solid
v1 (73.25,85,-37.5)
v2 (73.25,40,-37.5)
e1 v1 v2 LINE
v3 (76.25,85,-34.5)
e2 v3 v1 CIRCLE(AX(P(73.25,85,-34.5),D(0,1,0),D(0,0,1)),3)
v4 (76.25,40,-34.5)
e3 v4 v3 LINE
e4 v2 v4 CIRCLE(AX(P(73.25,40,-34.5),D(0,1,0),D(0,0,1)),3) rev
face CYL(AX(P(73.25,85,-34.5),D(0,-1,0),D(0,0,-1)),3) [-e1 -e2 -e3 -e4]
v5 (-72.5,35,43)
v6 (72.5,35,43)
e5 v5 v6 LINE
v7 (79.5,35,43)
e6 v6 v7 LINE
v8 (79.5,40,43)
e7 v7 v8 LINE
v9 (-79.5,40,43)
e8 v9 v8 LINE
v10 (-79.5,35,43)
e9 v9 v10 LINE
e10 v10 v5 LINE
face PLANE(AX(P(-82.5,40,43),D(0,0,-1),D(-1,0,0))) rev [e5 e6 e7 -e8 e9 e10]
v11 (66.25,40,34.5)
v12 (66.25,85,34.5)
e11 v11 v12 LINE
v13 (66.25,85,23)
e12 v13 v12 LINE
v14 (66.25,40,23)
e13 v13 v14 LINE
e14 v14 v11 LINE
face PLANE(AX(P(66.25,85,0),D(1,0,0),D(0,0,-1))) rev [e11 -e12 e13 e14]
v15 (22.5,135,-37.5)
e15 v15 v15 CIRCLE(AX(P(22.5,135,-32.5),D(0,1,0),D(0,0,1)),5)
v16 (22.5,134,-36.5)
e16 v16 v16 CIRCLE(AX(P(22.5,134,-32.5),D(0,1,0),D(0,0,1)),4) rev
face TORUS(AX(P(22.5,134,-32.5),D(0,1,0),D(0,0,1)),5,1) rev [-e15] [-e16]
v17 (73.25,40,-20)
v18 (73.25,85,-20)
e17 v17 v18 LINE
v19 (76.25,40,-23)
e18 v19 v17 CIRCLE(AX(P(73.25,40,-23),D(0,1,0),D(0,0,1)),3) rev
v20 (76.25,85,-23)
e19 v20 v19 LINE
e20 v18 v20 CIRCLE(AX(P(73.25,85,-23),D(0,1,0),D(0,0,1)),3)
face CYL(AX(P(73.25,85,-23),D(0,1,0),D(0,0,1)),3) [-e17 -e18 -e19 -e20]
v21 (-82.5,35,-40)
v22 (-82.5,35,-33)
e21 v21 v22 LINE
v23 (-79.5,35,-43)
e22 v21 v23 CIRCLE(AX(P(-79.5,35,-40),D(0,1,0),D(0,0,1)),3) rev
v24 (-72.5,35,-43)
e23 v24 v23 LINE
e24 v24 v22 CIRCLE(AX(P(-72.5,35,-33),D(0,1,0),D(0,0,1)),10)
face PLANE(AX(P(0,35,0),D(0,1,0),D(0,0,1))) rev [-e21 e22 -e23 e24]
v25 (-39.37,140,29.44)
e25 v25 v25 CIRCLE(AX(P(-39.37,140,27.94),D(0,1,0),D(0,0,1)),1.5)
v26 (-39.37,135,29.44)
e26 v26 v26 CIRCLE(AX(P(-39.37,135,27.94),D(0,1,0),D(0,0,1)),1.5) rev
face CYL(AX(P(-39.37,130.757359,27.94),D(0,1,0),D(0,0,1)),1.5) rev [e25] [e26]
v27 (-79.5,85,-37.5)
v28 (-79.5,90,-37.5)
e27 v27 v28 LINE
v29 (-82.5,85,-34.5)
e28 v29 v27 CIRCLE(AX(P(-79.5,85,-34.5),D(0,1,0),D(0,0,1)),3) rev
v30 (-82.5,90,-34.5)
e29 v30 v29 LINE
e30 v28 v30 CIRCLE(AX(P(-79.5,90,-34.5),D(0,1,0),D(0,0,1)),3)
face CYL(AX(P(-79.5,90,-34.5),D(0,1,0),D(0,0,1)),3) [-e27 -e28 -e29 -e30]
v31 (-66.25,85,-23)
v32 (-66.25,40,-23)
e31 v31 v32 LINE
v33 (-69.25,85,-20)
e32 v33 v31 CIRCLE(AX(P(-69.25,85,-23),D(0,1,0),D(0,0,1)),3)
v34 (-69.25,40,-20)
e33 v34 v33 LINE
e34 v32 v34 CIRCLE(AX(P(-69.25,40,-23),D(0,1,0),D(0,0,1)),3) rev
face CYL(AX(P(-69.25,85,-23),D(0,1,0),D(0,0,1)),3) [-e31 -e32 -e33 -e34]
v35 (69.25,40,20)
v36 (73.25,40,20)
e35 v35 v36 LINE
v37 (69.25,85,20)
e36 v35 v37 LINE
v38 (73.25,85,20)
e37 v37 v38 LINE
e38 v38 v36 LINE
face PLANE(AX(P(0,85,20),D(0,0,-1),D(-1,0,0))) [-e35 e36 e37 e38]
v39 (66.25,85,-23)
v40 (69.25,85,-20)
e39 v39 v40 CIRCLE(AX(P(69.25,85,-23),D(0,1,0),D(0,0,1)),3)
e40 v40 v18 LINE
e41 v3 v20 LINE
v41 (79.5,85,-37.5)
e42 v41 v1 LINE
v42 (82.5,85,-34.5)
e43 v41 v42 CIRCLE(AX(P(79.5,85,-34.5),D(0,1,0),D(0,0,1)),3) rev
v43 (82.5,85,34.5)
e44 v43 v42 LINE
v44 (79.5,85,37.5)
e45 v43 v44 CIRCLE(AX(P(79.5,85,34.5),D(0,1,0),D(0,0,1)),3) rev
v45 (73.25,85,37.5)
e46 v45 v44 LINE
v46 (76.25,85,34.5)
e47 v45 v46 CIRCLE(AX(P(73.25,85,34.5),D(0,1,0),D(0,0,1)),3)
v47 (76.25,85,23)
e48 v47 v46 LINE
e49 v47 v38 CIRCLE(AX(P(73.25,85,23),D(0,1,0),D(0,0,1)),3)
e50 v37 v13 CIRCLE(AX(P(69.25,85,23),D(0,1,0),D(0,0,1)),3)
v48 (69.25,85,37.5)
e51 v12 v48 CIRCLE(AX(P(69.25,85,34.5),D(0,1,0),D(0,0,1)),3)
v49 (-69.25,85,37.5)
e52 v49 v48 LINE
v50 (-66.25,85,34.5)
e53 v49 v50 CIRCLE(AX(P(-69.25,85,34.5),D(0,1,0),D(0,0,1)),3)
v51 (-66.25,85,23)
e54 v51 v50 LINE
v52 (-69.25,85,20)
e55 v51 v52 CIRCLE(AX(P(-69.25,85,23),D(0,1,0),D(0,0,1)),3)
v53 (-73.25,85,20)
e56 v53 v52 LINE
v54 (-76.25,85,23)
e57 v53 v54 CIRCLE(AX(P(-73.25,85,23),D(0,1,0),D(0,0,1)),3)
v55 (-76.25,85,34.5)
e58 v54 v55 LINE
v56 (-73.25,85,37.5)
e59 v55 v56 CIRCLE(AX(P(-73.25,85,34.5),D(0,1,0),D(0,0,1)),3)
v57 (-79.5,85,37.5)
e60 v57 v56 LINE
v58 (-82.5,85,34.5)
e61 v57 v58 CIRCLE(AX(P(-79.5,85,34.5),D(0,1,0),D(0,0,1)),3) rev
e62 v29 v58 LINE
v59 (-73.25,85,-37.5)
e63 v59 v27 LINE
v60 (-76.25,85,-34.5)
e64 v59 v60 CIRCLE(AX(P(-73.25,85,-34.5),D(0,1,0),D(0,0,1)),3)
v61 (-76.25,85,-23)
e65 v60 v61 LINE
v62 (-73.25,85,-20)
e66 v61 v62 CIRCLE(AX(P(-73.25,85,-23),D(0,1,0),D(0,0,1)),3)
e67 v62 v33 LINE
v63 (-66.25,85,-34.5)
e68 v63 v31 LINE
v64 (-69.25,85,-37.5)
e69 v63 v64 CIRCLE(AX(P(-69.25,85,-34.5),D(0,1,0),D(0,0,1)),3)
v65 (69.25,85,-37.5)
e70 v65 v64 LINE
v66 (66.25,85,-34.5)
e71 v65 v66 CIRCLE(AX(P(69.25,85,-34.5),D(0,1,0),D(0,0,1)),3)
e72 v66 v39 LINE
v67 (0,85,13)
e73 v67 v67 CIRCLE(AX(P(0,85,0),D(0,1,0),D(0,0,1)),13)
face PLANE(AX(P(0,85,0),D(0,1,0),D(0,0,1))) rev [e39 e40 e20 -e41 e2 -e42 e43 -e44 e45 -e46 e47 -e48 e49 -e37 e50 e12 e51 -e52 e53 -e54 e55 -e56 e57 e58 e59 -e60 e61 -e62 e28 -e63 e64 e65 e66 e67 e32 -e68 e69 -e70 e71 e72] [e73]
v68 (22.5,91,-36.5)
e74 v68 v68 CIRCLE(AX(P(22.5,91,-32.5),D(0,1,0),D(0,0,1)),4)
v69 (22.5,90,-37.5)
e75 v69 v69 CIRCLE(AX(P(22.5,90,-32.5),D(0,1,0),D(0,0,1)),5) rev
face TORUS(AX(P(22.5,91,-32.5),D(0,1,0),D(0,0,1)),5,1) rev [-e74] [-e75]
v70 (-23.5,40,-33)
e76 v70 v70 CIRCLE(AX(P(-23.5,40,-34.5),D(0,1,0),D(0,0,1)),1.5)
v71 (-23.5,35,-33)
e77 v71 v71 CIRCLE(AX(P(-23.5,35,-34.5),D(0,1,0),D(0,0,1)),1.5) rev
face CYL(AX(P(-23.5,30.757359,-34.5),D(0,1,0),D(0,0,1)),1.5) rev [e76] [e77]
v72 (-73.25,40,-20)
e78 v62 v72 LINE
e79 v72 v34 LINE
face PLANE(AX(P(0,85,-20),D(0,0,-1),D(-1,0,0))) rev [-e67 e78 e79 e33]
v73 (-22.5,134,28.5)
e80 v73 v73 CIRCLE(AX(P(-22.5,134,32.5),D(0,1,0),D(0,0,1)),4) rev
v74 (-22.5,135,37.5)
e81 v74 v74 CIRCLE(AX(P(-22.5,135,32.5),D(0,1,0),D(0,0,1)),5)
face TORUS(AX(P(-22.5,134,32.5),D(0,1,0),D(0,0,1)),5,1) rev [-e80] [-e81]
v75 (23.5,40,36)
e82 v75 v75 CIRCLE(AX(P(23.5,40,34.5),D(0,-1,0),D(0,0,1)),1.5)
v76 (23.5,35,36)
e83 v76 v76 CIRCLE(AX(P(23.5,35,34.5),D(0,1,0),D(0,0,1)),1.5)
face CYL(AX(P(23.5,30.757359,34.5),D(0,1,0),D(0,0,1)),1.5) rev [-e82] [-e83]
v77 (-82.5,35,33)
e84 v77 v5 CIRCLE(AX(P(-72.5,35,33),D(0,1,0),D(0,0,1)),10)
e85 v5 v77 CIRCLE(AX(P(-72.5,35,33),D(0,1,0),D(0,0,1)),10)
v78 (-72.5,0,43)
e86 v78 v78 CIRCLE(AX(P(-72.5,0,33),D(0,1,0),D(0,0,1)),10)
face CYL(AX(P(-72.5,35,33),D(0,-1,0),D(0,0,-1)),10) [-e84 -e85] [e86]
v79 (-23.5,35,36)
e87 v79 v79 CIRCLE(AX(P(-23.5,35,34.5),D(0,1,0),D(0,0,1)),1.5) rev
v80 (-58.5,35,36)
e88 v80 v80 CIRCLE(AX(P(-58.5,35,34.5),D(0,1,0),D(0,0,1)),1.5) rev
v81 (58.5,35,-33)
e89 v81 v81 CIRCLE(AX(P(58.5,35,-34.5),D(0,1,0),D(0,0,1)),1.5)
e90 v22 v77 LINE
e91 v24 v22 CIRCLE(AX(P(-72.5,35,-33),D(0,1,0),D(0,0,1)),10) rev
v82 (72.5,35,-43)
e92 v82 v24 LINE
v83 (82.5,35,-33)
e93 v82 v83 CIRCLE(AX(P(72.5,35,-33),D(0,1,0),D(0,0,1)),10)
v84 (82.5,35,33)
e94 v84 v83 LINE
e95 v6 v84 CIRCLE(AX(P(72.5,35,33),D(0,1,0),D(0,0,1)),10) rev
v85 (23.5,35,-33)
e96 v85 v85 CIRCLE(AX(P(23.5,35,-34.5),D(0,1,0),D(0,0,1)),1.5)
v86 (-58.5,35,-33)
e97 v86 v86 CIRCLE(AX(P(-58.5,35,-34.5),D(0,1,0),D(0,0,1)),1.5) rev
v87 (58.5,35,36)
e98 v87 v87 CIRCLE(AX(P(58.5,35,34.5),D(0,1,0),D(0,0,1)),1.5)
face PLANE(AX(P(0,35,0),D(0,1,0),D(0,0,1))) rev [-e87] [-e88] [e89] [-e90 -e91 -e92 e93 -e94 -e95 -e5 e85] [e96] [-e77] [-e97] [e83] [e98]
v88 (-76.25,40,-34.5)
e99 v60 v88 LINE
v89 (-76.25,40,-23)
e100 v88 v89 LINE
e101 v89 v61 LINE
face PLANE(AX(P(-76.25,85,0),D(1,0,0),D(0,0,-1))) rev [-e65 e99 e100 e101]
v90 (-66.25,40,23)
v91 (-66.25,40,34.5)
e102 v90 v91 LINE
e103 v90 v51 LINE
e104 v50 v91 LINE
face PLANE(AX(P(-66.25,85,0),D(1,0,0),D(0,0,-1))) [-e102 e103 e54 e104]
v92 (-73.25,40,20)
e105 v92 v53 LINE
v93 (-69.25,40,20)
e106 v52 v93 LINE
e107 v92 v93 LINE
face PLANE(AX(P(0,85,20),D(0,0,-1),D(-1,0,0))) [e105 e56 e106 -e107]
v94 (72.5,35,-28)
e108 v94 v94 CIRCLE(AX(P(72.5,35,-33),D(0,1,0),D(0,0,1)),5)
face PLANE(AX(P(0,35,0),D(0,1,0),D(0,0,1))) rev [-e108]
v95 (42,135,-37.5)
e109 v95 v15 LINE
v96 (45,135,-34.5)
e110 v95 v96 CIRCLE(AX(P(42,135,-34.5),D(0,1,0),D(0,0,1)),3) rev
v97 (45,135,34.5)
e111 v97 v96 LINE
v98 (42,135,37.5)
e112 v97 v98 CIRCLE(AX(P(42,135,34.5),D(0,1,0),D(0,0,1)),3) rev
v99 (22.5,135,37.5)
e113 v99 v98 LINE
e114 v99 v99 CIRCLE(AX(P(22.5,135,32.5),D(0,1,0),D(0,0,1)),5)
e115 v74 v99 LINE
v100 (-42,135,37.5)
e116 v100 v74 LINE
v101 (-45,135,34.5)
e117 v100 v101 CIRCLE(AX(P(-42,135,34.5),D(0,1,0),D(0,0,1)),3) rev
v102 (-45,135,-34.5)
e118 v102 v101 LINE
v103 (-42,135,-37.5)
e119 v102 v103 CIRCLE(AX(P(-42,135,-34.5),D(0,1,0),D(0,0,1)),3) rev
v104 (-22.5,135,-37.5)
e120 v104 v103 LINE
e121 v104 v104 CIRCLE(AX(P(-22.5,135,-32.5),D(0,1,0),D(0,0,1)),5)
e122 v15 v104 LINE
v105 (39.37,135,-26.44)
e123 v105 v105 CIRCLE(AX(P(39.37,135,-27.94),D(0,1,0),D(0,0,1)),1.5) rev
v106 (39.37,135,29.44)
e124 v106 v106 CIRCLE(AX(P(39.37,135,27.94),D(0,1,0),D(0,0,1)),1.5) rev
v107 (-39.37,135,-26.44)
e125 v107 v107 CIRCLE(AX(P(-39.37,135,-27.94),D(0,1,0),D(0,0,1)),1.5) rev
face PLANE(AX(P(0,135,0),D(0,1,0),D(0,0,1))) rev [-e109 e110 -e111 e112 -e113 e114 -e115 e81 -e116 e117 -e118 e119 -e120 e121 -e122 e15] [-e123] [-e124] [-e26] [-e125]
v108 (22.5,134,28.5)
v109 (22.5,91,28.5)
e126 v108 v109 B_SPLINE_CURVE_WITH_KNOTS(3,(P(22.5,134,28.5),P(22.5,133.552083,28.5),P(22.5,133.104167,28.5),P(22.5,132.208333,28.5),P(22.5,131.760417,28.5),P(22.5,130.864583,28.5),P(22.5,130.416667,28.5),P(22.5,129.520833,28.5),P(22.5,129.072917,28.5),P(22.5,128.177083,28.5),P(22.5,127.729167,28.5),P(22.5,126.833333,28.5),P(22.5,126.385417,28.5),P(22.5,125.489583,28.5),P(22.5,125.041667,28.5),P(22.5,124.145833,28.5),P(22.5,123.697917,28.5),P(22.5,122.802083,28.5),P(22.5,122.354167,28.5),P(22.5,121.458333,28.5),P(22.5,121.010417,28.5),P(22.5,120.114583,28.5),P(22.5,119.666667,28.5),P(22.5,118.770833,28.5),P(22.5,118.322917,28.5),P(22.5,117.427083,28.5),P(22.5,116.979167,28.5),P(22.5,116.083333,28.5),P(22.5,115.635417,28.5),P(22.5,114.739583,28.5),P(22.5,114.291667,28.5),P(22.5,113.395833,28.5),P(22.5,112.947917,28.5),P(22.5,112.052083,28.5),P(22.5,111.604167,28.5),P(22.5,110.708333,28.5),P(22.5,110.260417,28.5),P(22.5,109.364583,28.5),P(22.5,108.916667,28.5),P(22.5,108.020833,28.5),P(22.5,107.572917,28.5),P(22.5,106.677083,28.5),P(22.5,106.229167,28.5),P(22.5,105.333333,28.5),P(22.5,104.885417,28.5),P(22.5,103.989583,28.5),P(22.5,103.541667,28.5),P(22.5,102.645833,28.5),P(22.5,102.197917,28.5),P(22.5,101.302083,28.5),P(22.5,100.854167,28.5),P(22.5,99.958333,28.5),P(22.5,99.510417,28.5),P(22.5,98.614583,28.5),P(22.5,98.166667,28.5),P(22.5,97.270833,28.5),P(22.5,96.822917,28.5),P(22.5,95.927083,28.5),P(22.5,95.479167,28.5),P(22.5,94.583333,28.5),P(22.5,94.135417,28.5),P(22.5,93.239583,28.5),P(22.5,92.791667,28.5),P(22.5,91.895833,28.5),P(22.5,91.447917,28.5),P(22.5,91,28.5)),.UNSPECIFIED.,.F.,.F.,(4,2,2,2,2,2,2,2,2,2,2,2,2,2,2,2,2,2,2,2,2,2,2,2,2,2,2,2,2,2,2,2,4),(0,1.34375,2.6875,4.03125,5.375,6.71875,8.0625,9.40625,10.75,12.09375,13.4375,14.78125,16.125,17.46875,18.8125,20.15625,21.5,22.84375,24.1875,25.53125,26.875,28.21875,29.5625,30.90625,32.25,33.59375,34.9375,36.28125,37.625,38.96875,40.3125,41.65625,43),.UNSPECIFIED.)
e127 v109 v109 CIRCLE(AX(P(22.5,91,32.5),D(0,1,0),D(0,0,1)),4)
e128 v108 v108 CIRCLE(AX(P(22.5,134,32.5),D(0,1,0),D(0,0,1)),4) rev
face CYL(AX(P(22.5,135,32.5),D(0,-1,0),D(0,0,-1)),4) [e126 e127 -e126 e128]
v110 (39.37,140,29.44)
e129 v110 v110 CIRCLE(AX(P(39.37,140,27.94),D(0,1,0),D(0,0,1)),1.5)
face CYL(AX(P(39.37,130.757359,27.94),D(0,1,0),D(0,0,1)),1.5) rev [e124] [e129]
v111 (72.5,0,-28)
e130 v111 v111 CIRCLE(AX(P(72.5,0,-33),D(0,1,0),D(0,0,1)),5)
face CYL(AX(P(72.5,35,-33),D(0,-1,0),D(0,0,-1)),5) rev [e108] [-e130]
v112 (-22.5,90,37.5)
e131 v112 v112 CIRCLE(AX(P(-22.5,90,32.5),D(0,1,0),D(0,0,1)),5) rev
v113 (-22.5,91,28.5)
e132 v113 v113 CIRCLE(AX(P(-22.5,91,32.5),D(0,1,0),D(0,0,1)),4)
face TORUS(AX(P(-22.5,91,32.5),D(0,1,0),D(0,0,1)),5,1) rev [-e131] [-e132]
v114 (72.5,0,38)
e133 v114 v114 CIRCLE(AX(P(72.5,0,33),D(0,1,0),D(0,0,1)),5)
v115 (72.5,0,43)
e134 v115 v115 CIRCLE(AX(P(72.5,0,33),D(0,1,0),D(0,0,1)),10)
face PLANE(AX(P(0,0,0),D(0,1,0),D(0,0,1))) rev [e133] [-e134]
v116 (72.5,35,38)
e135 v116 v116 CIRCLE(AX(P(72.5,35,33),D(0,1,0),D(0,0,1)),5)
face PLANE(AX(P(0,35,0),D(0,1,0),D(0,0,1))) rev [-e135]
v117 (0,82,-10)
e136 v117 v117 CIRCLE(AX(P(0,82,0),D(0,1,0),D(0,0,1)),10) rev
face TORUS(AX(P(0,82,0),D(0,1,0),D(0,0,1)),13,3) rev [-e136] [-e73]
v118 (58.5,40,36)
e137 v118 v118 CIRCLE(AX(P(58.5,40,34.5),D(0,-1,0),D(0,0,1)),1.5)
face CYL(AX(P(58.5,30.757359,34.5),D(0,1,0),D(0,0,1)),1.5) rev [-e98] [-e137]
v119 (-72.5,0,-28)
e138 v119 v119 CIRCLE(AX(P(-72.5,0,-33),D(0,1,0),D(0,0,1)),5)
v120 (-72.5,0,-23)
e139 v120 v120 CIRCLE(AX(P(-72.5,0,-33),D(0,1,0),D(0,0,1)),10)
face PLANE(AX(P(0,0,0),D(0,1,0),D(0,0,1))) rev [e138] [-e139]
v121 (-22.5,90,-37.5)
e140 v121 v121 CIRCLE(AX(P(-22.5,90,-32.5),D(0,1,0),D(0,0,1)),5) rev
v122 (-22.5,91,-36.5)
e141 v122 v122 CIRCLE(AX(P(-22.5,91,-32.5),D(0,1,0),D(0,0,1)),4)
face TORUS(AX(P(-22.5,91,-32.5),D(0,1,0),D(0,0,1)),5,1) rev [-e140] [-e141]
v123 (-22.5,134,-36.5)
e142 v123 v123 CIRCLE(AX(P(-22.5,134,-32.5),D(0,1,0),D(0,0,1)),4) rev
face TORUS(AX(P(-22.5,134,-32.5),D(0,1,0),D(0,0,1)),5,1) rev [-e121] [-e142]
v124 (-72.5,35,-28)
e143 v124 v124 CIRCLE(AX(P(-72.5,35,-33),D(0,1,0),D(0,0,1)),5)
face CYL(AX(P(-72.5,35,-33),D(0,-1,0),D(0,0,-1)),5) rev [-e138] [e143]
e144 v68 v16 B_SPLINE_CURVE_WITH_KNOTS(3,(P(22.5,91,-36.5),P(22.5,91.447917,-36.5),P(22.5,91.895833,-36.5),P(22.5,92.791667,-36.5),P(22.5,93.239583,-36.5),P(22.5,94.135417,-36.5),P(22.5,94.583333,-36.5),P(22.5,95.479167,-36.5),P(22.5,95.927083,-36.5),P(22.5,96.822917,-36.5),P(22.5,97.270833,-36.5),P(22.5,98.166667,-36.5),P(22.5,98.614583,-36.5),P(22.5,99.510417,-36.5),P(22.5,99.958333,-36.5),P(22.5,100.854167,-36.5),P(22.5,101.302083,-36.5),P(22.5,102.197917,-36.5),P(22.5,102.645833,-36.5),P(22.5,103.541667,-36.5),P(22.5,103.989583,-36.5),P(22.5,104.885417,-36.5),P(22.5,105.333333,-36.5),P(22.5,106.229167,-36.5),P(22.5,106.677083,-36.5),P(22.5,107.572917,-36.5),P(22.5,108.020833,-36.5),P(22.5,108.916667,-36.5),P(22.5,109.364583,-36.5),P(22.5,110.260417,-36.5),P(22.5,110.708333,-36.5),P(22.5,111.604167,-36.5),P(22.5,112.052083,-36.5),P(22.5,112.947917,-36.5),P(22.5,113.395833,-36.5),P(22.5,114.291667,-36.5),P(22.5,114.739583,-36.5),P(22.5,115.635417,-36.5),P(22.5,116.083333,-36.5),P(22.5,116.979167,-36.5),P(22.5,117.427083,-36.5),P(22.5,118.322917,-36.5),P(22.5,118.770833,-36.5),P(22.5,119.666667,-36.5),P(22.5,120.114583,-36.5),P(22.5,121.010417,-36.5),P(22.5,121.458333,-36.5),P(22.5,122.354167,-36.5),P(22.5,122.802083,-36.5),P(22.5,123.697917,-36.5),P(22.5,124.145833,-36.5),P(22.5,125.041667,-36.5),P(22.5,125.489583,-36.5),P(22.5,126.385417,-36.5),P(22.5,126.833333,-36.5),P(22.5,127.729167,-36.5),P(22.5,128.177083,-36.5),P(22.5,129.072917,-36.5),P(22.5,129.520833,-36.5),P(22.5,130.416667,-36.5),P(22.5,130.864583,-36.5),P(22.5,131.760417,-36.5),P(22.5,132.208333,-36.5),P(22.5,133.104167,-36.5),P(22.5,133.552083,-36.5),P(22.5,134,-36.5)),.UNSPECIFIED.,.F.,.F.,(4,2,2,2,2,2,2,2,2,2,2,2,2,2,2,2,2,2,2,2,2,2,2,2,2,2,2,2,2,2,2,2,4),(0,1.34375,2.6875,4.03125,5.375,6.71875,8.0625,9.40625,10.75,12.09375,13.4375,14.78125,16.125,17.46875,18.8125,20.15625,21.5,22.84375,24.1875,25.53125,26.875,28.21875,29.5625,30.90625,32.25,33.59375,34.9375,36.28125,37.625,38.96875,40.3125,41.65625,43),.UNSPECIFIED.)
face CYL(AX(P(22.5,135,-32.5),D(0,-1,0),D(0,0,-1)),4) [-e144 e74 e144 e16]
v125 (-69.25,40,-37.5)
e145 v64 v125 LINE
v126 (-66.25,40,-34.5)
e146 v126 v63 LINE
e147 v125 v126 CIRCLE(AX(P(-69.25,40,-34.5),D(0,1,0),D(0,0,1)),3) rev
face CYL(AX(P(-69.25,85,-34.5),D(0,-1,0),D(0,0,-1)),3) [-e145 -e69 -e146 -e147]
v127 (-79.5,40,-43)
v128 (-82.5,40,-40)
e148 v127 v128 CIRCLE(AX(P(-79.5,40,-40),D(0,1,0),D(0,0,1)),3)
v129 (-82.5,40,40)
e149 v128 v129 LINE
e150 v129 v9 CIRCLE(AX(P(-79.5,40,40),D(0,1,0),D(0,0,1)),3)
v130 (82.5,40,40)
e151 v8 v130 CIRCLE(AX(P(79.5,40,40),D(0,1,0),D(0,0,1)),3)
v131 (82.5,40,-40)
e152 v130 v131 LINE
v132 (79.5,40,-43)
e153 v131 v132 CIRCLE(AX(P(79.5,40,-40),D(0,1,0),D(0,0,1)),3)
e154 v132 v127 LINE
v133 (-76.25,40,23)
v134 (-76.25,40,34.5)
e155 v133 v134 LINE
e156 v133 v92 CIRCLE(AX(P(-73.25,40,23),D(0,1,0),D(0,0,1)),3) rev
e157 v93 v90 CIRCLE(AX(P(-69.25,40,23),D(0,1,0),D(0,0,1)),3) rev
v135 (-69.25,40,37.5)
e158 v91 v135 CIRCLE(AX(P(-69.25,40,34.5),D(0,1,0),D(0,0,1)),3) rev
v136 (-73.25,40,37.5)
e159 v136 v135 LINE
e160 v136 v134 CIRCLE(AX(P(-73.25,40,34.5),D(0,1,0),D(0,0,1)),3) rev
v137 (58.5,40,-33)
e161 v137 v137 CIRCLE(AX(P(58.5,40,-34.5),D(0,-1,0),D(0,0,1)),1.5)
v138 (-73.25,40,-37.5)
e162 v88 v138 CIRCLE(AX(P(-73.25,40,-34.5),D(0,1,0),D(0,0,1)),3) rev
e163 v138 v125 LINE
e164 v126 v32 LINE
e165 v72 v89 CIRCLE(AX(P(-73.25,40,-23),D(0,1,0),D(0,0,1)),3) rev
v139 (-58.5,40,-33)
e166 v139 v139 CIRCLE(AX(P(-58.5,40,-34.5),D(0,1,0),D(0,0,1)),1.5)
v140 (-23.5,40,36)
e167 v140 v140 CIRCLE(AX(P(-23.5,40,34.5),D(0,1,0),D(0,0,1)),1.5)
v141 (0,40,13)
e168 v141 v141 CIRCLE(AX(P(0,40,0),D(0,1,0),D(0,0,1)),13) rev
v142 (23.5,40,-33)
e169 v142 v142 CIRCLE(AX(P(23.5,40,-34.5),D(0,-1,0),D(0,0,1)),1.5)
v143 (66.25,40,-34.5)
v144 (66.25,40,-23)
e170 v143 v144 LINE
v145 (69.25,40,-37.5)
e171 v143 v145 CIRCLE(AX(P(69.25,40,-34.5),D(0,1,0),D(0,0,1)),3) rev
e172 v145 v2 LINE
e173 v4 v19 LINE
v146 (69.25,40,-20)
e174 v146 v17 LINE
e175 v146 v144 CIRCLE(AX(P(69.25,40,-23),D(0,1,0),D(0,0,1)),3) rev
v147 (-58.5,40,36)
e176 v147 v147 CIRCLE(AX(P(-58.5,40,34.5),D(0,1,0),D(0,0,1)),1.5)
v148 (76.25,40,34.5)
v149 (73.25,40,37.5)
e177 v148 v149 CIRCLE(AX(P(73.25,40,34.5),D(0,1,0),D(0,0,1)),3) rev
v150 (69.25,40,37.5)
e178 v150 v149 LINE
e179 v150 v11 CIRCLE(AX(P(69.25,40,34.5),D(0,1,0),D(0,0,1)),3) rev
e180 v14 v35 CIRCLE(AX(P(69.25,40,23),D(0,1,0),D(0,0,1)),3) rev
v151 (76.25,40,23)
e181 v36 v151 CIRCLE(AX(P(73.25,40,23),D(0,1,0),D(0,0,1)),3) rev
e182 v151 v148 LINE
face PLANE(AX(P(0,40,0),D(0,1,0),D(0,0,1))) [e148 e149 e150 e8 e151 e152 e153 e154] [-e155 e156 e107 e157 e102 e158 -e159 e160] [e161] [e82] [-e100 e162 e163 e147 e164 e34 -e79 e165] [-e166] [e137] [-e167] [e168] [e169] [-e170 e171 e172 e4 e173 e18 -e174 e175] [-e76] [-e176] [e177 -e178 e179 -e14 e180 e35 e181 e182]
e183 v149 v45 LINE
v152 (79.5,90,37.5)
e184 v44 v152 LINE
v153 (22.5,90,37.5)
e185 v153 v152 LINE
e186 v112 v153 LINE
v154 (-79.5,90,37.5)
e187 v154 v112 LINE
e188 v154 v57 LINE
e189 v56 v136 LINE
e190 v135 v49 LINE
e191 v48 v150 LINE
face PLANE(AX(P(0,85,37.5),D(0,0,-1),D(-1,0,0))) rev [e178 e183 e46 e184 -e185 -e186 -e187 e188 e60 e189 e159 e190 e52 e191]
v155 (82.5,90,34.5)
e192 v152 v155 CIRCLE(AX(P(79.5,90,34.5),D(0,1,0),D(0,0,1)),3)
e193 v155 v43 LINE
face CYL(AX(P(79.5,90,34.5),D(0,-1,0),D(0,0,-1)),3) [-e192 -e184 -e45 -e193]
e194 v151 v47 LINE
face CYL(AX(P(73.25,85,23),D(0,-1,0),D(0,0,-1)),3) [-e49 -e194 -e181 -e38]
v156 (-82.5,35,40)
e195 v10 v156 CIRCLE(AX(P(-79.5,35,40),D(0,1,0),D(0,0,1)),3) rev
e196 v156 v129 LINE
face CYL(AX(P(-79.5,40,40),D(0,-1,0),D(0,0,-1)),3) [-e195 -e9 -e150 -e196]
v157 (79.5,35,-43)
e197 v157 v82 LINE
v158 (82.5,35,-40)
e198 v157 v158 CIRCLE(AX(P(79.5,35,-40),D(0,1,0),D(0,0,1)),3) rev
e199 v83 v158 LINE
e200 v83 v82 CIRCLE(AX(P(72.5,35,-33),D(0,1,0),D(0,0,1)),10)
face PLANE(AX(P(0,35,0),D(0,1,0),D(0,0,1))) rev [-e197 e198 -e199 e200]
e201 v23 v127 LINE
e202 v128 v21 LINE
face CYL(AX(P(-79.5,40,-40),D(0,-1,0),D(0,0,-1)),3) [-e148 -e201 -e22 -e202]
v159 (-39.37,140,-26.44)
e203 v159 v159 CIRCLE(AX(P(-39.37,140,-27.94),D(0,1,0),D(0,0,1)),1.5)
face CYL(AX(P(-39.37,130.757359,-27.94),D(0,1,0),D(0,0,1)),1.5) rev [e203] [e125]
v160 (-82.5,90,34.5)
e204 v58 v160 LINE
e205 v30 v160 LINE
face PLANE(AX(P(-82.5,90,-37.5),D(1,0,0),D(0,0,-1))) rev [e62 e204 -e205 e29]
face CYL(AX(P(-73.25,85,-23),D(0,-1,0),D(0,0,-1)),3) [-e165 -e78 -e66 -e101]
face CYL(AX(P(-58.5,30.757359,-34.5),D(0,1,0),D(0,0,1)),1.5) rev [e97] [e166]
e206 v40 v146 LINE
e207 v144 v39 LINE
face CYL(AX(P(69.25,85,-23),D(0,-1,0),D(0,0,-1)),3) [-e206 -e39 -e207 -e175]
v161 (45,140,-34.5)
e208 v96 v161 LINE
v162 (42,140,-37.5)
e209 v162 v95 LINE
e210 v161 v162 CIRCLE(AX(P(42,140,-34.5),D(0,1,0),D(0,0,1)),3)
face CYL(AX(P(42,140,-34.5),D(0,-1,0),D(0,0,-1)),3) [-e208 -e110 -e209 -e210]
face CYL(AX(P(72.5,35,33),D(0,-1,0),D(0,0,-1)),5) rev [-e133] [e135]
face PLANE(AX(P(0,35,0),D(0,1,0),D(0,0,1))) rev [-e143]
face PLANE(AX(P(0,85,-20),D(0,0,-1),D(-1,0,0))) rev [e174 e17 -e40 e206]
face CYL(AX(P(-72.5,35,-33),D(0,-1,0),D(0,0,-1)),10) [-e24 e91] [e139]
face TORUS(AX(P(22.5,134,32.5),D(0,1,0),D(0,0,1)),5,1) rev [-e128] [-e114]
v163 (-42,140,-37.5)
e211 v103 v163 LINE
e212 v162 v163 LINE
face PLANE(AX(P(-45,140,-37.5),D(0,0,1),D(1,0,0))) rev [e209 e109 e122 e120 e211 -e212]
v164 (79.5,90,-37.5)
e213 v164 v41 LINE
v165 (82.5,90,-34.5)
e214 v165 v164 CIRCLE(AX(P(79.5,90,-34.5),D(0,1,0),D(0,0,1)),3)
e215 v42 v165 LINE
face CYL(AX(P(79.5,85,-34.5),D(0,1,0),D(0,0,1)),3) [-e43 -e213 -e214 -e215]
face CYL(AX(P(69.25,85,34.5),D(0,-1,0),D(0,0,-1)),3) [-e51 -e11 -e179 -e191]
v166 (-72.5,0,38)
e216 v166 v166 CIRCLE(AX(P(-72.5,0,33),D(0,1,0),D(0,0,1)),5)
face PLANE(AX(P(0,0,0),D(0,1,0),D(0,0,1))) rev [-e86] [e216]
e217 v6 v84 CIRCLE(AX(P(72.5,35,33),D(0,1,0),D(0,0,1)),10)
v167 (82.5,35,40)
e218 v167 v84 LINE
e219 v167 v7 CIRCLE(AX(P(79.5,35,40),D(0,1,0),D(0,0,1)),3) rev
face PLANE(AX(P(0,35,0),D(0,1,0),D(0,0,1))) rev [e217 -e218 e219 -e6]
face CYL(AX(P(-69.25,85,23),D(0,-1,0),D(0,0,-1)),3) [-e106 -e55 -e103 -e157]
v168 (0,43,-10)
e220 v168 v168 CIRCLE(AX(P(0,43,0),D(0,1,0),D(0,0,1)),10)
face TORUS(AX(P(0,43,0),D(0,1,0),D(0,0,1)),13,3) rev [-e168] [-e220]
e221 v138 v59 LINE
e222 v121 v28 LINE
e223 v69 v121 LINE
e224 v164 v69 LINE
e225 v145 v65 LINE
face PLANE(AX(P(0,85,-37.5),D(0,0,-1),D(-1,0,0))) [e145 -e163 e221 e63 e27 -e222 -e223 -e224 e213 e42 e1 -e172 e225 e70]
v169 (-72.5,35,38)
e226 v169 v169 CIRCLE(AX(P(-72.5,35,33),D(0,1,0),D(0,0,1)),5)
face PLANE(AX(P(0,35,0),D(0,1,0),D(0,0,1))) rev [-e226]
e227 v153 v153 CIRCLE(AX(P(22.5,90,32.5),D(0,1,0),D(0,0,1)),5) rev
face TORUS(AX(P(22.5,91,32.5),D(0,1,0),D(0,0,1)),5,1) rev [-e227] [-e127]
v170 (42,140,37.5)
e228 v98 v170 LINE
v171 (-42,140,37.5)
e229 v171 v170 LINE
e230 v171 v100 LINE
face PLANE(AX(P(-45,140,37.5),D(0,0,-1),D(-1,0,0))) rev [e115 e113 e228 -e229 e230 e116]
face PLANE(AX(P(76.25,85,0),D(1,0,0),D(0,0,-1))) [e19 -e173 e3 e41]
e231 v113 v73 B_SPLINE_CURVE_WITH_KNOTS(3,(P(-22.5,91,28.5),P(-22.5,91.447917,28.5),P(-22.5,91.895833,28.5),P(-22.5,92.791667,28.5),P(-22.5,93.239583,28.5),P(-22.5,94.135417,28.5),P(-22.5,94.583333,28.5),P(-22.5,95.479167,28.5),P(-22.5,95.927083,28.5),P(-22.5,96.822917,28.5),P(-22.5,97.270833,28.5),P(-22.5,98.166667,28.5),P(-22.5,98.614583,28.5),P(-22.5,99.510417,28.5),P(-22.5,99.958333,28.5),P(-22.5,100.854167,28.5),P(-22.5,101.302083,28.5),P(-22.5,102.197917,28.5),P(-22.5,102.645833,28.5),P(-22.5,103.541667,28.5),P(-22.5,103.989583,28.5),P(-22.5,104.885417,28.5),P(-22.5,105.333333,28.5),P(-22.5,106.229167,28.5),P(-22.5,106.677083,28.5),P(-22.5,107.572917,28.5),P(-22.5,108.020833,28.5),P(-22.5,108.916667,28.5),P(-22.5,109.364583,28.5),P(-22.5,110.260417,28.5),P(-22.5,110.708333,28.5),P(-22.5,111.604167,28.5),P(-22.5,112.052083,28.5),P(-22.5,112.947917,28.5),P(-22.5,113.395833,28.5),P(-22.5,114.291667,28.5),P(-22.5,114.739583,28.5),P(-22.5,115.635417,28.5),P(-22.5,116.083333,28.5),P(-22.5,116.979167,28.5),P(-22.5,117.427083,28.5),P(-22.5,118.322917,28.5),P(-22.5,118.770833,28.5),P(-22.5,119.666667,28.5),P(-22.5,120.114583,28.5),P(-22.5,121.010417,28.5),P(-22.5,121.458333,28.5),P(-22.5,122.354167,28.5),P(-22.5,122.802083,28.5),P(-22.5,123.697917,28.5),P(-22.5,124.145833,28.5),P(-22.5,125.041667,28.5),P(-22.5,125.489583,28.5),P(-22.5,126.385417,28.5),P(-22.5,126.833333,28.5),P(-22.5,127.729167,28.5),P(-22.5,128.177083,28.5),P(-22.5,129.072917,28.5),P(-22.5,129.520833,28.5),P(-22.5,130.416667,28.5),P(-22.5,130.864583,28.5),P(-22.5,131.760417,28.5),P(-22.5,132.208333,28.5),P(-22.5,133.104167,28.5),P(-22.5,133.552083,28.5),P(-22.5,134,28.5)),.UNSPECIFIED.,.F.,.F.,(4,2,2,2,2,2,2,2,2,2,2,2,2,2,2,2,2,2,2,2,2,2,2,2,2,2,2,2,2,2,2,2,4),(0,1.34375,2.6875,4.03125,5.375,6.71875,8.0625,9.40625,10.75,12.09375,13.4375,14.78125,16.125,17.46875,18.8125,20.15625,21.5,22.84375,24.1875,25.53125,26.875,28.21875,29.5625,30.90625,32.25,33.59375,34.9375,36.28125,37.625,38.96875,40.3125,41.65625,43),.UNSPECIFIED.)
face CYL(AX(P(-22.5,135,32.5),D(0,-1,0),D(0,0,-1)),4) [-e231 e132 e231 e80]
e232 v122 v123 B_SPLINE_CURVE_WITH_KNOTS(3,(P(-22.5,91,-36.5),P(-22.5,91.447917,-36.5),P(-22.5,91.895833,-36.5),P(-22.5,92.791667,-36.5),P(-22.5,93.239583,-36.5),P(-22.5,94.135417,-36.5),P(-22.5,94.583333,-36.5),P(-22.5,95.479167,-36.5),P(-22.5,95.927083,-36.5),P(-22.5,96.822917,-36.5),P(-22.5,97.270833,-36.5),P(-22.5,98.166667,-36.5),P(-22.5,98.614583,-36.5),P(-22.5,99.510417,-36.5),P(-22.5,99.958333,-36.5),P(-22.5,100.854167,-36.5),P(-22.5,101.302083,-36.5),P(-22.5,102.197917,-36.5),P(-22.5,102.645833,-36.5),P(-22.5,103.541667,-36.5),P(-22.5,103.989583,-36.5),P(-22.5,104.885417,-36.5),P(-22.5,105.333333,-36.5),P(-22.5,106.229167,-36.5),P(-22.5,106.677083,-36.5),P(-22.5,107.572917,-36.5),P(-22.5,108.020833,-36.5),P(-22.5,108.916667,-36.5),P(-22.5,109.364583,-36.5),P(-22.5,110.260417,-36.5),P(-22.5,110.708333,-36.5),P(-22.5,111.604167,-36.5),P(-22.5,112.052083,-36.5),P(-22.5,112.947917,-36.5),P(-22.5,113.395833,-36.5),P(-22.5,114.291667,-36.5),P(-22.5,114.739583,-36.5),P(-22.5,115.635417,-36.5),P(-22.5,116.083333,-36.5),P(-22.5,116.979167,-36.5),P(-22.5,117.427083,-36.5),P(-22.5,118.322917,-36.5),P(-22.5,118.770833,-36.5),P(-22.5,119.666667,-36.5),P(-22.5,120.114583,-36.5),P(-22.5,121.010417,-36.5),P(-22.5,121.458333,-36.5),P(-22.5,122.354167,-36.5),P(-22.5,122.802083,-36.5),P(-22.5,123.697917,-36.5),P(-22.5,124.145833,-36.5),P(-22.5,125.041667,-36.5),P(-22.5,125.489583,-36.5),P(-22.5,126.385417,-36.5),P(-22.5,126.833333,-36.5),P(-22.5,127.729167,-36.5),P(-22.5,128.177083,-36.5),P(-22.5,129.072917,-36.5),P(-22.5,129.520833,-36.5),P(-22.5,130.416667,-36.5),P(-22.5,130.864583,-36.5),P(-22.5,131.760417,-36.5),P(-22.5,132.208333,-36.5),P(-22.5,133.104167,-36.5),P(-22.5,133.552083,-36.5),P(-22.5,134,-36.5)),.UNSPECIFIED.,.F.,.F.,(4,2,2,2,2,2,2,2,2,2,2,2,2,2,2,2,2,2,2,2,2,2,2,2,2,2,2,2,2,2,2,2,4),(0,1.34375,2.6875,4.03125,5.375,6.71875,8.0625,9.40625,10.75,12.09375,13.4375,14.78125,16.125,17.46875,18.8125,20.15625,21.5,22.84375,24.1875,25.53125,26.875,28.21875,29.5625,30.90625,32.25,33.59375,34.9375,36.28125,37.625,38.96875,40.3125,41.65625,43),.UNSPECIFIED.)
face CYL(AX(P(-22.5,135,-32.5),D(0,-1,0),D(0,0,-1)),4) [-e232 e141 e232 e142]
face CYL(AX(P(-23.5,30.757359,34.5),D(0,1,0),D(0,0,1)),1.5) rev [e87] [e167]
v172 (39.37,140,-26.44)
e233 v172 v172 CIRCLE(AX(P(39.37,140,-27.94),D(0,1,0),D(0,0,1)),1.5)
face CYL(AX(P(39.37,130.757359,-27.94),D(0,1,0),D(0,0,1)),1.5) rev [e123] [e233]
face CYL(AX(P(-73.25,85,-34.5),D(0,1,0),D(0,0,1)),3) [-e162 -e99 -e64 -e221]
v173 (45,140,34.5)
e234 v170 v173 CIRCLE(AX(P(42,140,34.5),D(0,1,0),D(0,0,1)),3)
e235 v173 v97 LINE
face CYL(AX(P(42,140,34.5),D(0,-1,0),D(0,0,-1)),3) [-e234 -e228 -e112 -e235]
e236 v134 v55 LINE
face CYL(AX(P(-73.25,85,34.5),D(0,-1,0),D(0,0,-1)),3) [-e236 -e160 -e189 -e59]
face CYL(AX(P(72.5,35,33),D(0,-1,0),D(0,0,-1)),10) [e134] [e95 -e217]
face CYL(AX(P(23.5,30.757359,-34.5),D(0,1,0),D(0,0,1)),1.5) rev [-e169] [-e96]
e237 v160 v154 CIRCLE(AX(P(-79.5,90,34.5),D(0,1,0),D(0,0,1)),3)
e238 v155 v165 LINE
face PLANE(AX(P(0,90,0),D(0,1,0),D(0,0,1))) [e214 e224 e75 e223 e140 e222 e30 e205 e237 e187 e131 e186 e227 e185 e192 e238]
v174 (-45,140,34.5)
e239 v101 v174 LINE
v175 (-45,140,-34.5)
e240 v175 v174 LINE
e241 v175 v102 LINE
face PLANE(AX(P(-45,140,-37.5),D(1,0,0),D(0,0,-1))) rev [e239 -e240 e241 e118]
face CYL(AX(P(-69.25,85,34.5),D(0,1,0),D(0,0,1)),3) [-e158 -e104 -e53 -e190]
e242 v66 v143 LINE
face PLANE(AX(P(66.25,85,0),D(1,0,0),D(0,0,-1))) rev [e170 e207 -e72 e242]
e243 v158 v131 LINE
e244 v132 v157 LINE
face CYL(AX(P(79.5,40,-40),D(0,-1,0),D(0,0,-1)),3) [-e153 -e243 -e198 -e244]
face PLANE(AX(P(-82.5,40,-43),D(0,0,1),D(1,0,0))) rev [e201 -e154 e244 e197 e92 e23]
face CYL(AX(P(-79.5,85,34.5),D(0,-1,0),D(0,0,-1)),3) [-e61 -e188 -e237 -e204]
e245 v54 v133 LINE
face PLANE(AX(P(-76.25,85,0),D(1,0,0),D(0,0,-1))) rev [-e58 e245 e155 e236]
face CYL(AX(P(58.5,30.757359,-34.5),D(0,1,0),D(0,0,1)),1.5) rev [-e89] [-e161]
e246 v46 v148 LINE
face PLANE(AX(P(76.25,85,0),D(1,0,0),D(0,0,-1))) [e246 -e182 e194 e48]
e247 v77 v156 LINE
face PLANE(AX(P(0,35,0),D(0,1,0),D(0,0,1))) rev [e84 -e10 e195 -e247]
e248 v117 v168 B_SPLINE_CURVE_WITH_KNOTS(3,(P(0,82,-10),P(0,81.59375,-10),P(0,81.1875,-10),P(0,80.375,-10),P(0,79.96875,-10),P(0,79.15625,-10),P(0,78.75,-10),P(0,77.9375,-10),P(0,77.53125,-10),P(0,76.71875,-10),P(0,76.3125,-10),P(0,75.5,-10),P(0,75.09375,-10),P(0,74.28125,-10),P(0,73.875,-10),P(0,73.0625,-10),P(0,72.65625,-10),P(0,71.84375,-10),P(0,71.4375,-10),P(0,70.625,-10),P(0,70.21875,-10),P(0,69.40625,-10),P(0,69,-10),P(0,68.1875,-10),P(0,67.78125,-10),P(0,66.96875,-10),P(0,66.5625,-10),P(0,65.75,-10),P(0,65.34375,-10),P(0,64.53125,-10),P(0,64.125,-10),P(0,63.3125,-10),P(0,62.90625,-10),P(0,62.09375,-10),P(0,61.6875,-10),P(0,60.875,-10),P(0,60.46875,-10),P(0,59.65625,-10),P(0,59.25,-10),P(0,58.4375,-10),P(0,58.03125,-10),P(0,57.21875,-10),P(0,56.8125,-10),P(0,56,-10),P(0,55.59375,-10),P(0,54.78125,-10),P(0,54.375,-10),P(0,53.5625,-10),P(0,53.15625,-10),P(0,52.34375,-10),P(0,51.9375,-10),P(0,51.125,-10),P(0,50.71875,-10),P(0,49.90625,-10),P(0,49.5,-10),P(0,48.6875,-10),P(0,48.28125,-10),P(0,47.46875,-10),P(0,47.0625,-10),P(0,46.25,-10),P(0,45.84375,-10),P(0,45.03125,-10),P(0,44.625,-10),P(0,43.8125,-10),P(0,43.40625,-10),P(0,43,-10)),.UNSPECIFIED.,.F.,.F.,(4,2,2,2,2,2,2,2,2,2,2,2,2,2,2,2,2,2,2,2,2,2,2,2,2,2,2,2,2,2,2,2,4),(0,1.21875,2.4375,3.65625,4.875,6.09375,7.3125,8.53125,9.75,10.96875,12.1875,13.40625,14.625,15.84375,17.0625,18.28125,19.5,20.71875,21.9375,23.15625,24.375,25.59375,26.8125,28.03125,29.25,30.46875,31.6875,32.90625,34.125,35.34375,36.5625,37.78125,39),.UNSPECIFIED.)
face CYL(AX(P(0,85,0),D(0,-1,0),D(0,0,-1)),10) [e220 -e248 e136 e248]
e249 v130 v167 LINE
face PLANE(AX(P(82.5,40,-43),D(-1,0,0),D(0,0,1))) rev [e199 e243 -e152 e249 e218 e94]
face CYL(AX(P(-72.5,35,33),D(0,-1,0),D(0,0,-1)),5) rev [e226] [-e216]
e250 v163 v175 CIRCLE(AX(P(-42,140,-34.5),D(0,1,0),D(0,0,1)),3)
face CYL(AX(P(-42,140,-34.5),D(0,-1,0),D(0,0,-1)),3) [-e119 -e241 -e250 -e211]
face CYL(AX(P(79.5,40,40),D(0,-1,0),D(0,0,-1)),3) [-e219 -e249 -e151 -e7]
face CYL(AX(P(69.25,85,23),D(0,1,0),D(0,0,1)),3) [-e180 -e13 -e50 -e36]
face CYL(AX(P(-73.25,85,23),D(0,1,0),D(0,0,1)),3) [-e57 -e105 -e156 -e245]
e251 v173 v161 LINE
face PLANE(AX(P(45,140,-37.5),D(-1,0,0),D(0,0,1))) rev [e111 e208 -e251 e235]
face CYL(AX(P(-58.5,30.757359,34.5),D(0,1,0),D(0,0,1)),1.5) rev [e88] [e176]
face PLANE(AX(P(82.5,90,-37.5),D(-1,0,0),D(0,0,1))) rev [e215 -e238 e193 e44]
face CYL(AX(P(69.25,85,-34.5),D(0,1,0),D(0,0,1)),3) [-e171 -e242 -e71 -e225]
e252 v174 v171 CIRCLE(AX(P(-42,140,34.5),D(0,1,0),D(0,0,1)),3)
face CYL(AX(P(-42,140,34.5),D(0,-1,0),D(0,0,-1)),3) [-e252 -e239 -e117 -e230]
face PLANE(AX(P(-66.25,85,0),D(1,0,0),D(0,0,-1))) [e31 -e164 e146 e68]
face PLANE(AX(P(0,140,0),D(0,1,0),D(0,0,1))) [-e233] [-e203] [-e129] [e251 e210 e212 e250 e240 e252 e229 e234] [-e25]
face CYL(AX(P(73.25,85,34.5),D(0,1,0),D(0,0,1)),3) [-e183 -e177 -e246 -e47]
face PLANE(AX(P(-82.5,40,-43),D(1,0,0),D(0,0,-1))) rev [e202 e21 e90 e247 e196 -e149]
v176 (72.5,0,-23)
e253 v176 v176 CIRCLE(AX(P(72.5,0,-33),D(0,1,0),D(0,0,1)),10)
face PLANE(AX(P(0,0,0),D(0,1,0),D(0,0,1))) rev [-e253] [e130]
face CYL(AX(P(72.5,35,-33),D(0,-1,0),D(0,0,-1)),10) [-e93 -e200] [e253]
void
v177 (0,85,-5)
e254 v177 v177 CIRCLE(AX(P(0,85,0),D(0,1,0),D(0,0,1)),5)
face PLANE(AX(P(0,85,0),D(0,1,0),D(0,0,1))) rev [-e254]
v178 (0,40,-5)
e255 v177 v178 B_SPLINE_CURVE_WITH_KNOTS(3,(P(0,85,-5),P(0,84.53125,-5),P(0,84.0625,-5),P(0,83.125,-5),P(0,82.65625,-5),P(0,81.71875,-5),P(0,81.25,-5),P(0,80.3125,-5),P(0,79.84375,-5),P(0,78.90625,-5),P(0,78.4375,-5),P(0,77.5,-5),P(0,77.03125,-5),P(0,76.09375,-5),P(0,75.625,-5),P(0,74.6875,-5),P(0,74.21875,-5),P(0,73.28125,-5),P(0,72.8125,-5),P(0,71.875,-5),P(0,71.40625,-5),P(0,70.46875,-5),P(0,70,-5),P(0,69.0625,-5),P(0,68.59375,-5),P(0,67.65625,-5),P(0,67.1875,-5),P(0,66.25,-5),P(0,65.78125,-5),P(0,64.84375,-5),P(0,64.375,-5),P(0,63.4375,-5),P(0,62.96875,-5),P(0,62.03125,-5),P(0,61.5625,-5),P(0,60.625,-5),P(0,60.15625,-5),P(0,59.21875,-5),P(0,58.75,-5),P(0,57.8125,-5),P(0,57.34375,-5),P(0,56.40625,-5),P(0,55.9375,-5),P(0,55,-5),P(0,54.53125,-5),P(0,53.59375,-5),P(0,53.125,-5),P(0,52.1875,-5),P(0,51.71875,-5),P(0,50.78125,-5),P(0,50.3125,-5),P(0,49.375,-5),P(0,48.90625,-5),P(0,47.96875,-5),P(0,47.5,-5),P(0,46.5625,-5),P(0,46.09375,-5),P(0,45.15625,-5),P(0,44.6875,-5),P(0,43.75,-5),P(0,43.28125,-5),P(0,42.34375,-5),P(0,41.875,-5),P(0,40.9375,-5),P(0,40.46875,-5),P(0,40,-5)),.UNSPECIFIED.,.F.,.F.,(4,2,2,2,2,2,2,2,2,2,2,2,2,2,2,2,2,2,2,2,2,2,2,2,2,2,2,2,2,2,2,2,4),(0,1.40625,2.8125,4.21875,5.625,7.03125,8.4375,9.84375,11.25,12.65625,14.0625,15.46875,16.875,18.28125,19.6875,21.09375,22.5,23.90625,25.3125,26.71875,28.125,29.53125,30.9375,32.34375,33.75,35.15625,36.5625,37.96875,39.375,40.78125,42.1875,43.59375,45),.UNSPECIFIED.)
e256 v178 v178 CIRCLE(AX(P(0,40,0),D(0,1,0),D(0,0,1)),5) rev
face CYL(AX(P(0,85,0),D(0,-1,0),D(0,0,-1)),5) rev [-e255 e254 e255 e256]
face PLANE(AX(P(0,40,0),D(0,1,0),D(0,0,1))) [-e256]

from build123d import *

# Parameters (mm, degrees)
SKETCH1_R             = 10
SKETCH1_R_2           = 5
BOSS_EXTRUDE1_DEPTH   = 35
BOSS_EXTRUDE1_2_DEPTH = 35
BOSS_EXTRUDE1_3_DEPTH = 35
BOSS_EXTRUDE1_4_DEPTH = 35
SKETCH2_W             = 165
SKETCH2_H             = 86
BOSS_EXTRUDE2_DEPTH   = 5
SKETCH3_R             = 1.5
CUT_EXTRUDE1_DEPTH    = 5
SKETCH4_W             = 10
SKETCH4_H             = 17.5
SKETCH4_R             = 10
SKETCH4_R_2           = 5
BOSS_EXTRUDE3_DEPTH   = 45
SKETCH5_W             = 165
SKETCH5_H             = 75
BOSS_EXTRUDE4_DEPTH   = 5
SKETCH6_R             = 4
BOSS_EXTRUDE5_DEPTH   = 45
SKETCH7_W             = 90
SKETCH7_H             = 75
BOSS_EXTRUDE6_DEPTH   = 5
SKETCH8_R             = 1.5
CUT_EXTRUDE3_DEPTH    = 5
FILLET2_R             = 3
FILLET3_R             = 3
FILLET4_R             = 1


with BuildPart() as part:
    # Sketch1 → Boss-Extrude1 (new body)
    with BuildSketch(Plane(origin=(0, 0, 0), x_dir=(1, 0, 0), z_dir=(0, 1, 0))):
        with Locations(Location((-72.5, -33, 0), (0, 0, 270))):
            Circle(SKETCH1_R)
        with Locations(Location((-72.5, -33, 0), (0, 0, 270))):
            Circle(SKETCH1_R_2, mode=Mode.SUBTRACT)
    extrude(amount=BOSS_EXTRUDE1_DEPTH)



with BuildPart() as body_2:
    # Sketch1 → Boss-Extrude1 2 (new body)
    with BuildSketch(Plane(origin=(0, 0, 0), x_dir=(1, 0, 0), z_dir=(0, 1, 0))):
        with Locations(Location((-72.5, 33, 0), (0, 0, 270))):
            Circle(SKETCH1_R)
        with Locations(Location((-72.5, 33, 0), (0, 0, 270))):
            Circle(SKETCH1_R_2, mode=Mode.SUBTRACT)
    extrude(amount=BOSS_EXTRUDE1_2_DEPTH)


with BuildPart() as body_3:
    # Sketch1 → Boss-Extrude1 3 (new body)
    with BuildSketch(Plane(origin=(0, 0, 0), x_dir=(1, 0, 0), z_dir=(0, 1, 0))):
        with Locations(Location((72.5, -33, 0), (0, 0, 270))):
            Circle(SKETCH1_R)
        with Locations(Location((72.5, -33, 0), (0, 0, 270))):
            Circle(SKETCH1_R_2, mode=Mode.SUBTRACT)
    extrude(amount=BOSS_EXTRUDE1_3_DEPTH)


with BuildPart() as body_4:
    # Sketch1 → Boss-Extrude1 4 (new body)
    with BuildSketch(Plane(origin=(0, 0, 0), x_dir=(1, 0, 0), z_dir=(0, 1, 0))):
        with Locations(Location((72.5, 33, 0), (0, 0, 270))):
            Circle(SKETCH1_R)
        with Locations(Location((72.5, 33, 0), (0, 0, 270))):
            Circle(SKETCH1_R_2, mode=Mode.SUBTRACT)
    extrude(amount=BOSS_EXTRUDE1_4_DEPTH)


with BuildPart() as part_1:
    add(part.part)

    add(body_2.part)  # Boss-Extrude2 merges body 2

    add(body_3.part)  # Boss-Extrude2 merges body 3

    add(body_4.part)  # Boss-Extrude2 merges body 4
    # Sketch2 → Boss-Extrude2 (add)
    with BuildSketch(Plane(origin=(0, 35, 0), x_dir=(1, 0, 0), z_dir=(0, 1, 0))):
        Rectangle(SKETCH2_W, SKETCH2_H)
    extrude(amount=BOSS_EXTRUDE2_DEPTH)

    # Sketch3 → Cut-Extrude1 (cut)
    with BuildSketch(Plane(origin=(0, 40, 0), x_dir=(1, 0, 0), z_dir=(0, 1, 0))):
        with Locations(Location((-58.5, 34.5, 0), (0, 0, 270))):
            Circle(SKETCH3_R)
        with Locations(Location((-23.5, 34.5, 0), (0, 0, 270))):
            Circle(SKETCH3_R)
        with Locations(Location((-58.5, -34.5, 0), (0, 0, 270))):
            Circle(SKETCH3_R)
        with Locations(Location((-23.5, -34.5, 0), (0, 0, 270))):
            Circle(SKETCH3_R)
    cut_extrude1 = extrude(amount=-CUT_EXTRUDE1_DEPTH, mode=Mode.SUBTRACT)

    # Mirror1: Cut-Extrude1 across plane
    add(cut_extrude1.mirror(Plane(origin=(0, 0, 0), x_dir=(0, 0, 1), z_dir=(1, 0, 0))), mode=Mode.SUBTRACT)

    # Sketch4 → Boss-Extrude3 (add)
    # profile 1 of 5: a face of its own
    with BuildSketch(Plane(origin=(0, 40, 0), x_dir=(1, 0, 0), z_dir=(0, 1, 0))):
        with Locations((-71.25, 28.75)):
            Rectangle(SKETCH4_W, SKETCH4_H)
    # profile 2 of 5: a face of its own
    with BuildSketch(Plane(origin=(0, 40, 0), x_dir=(1, 0, 0), z_dir=(0, 1, 0))):
        with Locations((-71.25, -28.75)):
            Rectangle(SKETCH4_W, SKETCH4_H)
    # profile 3 of 5: a face of its own
    with BuildSketch(Plane(origin=(0, 40, 0), x_dir=(1, 0, 0), z_dir=(0, 1, 0))):
        with Locations(Location((0, 0, 0), (0, 0, 90))):
            Circle(SKETCH4_R)
        with Locations(Location((0, 0, 0), (0, 0, 90))):
            Circle(SKETCH4_R_2, mode=Mode.SUBTRACT)
    # profile 4 of 5: a face of its own
    with BuildSketch(Plane(origin=(0, 40, 0), x_dir=(1, 0, 0), z_dir=(0, 1, 0))):
        with Locations((71.25, 28.75)):
            Rectangle(SKETCH4_W, SKETCH4_H)
    # profile 5 of 5: a face of its own
    with BuildSketch(Plane(origin=(0, 40, 0), x_dir=(1, 0, 0), z_dir=(0, 1, 0))):
        with Locations((71.25, -28.75)):
            Rectangle(SKETCH4_W, SKETCH4_H)
    extrude(amount=BOSS_EXTRUDE3_DEPTH)

    # Sketch5 → Boss-Extrude4 (add)
    with BuildSketch(Plane(origin=(0, 85, 0), x_dir=(1, 0, 0), z_dir=(0, 1, 0))):
        Rectangle(SKETCH5_W, SKETCH5_H)
    extrude(amount=BOSS_EXTRUDE4_DEPTH)

    # Sketch6 → Boss-Extrude5 (add)
    with BuildSketch(Plane(origin=(0, 90, 0), x_dir=(1, 0, 0), z_dir=(0, 1, 0))):
        with Locations(Location((-22.5, 32.5, 0), (0, 0, 90))):
            Circle(SKETCH6_R)
        with Locations(Location((-22.5, -32.5, 0), (0, 0, 90))):
            Circle(SKETCH6_R)
    boss_extrude5 = extrude(amount=BOSS_EXTRUDE5_DEPTH)

    # Mirror2: Boss-Extrude5 across plane
    add(boss_extrude5.mirror(Plane(origin=(0, 0, 0), x_dir=(0, 0, 1), z_dir=(1, 0, 0))))

    # Sketch7 → Boss-Extrude6 (add)
    with BuildSketch(Plane(origin=(0, 135, 0), x_dir=(1, 0, 0), z_dir=(0, 1, 0))):
        Rectangle(SKETCH7_W, SKETCH7_H)
    extrude(amount=BOSS_EXTRUDE6_DEPTH)

    # Sketch8 → Cut-Extrude3 (cut)
    with BuildSketch(Plane(origin=(0, 140, 0), x_dir=(1, 0, 0), z_dir=(0, 1, 0))):
        with Locations(Location((39.37, -27.94, 0), (0, 0, 270))):
            Circle(SKETCH8_R)
        with Locations(Location((-39.37, -27.94, 0), (0, 0, 270))):
            Circle(SKETCH8_R)
        with Locations(Location((39.37, 27.94, 0), (0, 0, 270))):
            Circle(SKETCH8_R)
        with Locations(Location((-39.37, 27.94, 0), (0, 0, 270))):
            Circle(SKETCH8_R)
    extrude(amount=-CUT_EXTRUDE3_DEPTH, mode=Mode.SUBTRACT)

    # Fillet2
    fillet2_edges = [part_1.edges().sort_by_distance(p)[0] for p in [
        (82.5, 37.5, -43),
        (-82.5, 37.5, -43),
        (66.25, 62.5, -37.5),
        (66.25, 62.5, -20),
        (76.25, 62.5, -20),
        (76.25, 62.5, -37.5),
        (-82.5, 37.5, 43),
        (76.25, 62.5, 20),
        (66.25, 62.5, 20),
        (66.25, 62.5, 37.5),
        (76.25, 62.5, 37.5),
        (82.5, 87.5, 37.5),
        (82.5, 87.5, -37.5),
        (-82.5, 87.5, -37.5),
        (-82.5, 87.5, 37.5),
        (45, 137.5, 37.5),
        (45, 137.5, -37.5),
        (-45, 137.5, -37.5),
        (-45, 137.5, 37.5),
        (-76.25, 62.5, -37.5),
        (-76.25, 62.5, -20),
        (-66.25, 62.5, -20),
        (-66.25, 62.5, -37.5),
        (-66.25, 62.5, 20),
        (-76.25, 62.5, 20),
        (-76.25, 62.5, 37.5),
        (-66.25, 62.5, 37.5),
        (82.5, 37.5, 43),
    ]]
    fillet(fillet2_edges, radius=FILLET2_R)

    # Fillet3
    fillet3_edges = [part_1.edges().sort_by_distance(p)[0] for p in [
        (0, 40, 10),
        (0, 85, 10),
    ]]
    fillet(fillet3_edges, radius=FILLET3_R)

    # Fillet4
    fillet4_edges = [part_1.edges().sort_by_distance(p)[0] for p in [
        (-22.5, 90, -28.5),
        (-22.5, 135, -28.5),
        (-22.5, 90, 36.5),
        (-22.5, 135, 36.5),
        (22.5, 90, -28.5),
        (22.5, 90, 36.5),
        (22.5, 135, -28.5),
        (22.5, 135, 36.5),
    ]]
    fillet(fillet4_edges, radius=FILLET4_R - 0.0001)  # a hair under: the kernel refuses the full size


solid = part_1.part
